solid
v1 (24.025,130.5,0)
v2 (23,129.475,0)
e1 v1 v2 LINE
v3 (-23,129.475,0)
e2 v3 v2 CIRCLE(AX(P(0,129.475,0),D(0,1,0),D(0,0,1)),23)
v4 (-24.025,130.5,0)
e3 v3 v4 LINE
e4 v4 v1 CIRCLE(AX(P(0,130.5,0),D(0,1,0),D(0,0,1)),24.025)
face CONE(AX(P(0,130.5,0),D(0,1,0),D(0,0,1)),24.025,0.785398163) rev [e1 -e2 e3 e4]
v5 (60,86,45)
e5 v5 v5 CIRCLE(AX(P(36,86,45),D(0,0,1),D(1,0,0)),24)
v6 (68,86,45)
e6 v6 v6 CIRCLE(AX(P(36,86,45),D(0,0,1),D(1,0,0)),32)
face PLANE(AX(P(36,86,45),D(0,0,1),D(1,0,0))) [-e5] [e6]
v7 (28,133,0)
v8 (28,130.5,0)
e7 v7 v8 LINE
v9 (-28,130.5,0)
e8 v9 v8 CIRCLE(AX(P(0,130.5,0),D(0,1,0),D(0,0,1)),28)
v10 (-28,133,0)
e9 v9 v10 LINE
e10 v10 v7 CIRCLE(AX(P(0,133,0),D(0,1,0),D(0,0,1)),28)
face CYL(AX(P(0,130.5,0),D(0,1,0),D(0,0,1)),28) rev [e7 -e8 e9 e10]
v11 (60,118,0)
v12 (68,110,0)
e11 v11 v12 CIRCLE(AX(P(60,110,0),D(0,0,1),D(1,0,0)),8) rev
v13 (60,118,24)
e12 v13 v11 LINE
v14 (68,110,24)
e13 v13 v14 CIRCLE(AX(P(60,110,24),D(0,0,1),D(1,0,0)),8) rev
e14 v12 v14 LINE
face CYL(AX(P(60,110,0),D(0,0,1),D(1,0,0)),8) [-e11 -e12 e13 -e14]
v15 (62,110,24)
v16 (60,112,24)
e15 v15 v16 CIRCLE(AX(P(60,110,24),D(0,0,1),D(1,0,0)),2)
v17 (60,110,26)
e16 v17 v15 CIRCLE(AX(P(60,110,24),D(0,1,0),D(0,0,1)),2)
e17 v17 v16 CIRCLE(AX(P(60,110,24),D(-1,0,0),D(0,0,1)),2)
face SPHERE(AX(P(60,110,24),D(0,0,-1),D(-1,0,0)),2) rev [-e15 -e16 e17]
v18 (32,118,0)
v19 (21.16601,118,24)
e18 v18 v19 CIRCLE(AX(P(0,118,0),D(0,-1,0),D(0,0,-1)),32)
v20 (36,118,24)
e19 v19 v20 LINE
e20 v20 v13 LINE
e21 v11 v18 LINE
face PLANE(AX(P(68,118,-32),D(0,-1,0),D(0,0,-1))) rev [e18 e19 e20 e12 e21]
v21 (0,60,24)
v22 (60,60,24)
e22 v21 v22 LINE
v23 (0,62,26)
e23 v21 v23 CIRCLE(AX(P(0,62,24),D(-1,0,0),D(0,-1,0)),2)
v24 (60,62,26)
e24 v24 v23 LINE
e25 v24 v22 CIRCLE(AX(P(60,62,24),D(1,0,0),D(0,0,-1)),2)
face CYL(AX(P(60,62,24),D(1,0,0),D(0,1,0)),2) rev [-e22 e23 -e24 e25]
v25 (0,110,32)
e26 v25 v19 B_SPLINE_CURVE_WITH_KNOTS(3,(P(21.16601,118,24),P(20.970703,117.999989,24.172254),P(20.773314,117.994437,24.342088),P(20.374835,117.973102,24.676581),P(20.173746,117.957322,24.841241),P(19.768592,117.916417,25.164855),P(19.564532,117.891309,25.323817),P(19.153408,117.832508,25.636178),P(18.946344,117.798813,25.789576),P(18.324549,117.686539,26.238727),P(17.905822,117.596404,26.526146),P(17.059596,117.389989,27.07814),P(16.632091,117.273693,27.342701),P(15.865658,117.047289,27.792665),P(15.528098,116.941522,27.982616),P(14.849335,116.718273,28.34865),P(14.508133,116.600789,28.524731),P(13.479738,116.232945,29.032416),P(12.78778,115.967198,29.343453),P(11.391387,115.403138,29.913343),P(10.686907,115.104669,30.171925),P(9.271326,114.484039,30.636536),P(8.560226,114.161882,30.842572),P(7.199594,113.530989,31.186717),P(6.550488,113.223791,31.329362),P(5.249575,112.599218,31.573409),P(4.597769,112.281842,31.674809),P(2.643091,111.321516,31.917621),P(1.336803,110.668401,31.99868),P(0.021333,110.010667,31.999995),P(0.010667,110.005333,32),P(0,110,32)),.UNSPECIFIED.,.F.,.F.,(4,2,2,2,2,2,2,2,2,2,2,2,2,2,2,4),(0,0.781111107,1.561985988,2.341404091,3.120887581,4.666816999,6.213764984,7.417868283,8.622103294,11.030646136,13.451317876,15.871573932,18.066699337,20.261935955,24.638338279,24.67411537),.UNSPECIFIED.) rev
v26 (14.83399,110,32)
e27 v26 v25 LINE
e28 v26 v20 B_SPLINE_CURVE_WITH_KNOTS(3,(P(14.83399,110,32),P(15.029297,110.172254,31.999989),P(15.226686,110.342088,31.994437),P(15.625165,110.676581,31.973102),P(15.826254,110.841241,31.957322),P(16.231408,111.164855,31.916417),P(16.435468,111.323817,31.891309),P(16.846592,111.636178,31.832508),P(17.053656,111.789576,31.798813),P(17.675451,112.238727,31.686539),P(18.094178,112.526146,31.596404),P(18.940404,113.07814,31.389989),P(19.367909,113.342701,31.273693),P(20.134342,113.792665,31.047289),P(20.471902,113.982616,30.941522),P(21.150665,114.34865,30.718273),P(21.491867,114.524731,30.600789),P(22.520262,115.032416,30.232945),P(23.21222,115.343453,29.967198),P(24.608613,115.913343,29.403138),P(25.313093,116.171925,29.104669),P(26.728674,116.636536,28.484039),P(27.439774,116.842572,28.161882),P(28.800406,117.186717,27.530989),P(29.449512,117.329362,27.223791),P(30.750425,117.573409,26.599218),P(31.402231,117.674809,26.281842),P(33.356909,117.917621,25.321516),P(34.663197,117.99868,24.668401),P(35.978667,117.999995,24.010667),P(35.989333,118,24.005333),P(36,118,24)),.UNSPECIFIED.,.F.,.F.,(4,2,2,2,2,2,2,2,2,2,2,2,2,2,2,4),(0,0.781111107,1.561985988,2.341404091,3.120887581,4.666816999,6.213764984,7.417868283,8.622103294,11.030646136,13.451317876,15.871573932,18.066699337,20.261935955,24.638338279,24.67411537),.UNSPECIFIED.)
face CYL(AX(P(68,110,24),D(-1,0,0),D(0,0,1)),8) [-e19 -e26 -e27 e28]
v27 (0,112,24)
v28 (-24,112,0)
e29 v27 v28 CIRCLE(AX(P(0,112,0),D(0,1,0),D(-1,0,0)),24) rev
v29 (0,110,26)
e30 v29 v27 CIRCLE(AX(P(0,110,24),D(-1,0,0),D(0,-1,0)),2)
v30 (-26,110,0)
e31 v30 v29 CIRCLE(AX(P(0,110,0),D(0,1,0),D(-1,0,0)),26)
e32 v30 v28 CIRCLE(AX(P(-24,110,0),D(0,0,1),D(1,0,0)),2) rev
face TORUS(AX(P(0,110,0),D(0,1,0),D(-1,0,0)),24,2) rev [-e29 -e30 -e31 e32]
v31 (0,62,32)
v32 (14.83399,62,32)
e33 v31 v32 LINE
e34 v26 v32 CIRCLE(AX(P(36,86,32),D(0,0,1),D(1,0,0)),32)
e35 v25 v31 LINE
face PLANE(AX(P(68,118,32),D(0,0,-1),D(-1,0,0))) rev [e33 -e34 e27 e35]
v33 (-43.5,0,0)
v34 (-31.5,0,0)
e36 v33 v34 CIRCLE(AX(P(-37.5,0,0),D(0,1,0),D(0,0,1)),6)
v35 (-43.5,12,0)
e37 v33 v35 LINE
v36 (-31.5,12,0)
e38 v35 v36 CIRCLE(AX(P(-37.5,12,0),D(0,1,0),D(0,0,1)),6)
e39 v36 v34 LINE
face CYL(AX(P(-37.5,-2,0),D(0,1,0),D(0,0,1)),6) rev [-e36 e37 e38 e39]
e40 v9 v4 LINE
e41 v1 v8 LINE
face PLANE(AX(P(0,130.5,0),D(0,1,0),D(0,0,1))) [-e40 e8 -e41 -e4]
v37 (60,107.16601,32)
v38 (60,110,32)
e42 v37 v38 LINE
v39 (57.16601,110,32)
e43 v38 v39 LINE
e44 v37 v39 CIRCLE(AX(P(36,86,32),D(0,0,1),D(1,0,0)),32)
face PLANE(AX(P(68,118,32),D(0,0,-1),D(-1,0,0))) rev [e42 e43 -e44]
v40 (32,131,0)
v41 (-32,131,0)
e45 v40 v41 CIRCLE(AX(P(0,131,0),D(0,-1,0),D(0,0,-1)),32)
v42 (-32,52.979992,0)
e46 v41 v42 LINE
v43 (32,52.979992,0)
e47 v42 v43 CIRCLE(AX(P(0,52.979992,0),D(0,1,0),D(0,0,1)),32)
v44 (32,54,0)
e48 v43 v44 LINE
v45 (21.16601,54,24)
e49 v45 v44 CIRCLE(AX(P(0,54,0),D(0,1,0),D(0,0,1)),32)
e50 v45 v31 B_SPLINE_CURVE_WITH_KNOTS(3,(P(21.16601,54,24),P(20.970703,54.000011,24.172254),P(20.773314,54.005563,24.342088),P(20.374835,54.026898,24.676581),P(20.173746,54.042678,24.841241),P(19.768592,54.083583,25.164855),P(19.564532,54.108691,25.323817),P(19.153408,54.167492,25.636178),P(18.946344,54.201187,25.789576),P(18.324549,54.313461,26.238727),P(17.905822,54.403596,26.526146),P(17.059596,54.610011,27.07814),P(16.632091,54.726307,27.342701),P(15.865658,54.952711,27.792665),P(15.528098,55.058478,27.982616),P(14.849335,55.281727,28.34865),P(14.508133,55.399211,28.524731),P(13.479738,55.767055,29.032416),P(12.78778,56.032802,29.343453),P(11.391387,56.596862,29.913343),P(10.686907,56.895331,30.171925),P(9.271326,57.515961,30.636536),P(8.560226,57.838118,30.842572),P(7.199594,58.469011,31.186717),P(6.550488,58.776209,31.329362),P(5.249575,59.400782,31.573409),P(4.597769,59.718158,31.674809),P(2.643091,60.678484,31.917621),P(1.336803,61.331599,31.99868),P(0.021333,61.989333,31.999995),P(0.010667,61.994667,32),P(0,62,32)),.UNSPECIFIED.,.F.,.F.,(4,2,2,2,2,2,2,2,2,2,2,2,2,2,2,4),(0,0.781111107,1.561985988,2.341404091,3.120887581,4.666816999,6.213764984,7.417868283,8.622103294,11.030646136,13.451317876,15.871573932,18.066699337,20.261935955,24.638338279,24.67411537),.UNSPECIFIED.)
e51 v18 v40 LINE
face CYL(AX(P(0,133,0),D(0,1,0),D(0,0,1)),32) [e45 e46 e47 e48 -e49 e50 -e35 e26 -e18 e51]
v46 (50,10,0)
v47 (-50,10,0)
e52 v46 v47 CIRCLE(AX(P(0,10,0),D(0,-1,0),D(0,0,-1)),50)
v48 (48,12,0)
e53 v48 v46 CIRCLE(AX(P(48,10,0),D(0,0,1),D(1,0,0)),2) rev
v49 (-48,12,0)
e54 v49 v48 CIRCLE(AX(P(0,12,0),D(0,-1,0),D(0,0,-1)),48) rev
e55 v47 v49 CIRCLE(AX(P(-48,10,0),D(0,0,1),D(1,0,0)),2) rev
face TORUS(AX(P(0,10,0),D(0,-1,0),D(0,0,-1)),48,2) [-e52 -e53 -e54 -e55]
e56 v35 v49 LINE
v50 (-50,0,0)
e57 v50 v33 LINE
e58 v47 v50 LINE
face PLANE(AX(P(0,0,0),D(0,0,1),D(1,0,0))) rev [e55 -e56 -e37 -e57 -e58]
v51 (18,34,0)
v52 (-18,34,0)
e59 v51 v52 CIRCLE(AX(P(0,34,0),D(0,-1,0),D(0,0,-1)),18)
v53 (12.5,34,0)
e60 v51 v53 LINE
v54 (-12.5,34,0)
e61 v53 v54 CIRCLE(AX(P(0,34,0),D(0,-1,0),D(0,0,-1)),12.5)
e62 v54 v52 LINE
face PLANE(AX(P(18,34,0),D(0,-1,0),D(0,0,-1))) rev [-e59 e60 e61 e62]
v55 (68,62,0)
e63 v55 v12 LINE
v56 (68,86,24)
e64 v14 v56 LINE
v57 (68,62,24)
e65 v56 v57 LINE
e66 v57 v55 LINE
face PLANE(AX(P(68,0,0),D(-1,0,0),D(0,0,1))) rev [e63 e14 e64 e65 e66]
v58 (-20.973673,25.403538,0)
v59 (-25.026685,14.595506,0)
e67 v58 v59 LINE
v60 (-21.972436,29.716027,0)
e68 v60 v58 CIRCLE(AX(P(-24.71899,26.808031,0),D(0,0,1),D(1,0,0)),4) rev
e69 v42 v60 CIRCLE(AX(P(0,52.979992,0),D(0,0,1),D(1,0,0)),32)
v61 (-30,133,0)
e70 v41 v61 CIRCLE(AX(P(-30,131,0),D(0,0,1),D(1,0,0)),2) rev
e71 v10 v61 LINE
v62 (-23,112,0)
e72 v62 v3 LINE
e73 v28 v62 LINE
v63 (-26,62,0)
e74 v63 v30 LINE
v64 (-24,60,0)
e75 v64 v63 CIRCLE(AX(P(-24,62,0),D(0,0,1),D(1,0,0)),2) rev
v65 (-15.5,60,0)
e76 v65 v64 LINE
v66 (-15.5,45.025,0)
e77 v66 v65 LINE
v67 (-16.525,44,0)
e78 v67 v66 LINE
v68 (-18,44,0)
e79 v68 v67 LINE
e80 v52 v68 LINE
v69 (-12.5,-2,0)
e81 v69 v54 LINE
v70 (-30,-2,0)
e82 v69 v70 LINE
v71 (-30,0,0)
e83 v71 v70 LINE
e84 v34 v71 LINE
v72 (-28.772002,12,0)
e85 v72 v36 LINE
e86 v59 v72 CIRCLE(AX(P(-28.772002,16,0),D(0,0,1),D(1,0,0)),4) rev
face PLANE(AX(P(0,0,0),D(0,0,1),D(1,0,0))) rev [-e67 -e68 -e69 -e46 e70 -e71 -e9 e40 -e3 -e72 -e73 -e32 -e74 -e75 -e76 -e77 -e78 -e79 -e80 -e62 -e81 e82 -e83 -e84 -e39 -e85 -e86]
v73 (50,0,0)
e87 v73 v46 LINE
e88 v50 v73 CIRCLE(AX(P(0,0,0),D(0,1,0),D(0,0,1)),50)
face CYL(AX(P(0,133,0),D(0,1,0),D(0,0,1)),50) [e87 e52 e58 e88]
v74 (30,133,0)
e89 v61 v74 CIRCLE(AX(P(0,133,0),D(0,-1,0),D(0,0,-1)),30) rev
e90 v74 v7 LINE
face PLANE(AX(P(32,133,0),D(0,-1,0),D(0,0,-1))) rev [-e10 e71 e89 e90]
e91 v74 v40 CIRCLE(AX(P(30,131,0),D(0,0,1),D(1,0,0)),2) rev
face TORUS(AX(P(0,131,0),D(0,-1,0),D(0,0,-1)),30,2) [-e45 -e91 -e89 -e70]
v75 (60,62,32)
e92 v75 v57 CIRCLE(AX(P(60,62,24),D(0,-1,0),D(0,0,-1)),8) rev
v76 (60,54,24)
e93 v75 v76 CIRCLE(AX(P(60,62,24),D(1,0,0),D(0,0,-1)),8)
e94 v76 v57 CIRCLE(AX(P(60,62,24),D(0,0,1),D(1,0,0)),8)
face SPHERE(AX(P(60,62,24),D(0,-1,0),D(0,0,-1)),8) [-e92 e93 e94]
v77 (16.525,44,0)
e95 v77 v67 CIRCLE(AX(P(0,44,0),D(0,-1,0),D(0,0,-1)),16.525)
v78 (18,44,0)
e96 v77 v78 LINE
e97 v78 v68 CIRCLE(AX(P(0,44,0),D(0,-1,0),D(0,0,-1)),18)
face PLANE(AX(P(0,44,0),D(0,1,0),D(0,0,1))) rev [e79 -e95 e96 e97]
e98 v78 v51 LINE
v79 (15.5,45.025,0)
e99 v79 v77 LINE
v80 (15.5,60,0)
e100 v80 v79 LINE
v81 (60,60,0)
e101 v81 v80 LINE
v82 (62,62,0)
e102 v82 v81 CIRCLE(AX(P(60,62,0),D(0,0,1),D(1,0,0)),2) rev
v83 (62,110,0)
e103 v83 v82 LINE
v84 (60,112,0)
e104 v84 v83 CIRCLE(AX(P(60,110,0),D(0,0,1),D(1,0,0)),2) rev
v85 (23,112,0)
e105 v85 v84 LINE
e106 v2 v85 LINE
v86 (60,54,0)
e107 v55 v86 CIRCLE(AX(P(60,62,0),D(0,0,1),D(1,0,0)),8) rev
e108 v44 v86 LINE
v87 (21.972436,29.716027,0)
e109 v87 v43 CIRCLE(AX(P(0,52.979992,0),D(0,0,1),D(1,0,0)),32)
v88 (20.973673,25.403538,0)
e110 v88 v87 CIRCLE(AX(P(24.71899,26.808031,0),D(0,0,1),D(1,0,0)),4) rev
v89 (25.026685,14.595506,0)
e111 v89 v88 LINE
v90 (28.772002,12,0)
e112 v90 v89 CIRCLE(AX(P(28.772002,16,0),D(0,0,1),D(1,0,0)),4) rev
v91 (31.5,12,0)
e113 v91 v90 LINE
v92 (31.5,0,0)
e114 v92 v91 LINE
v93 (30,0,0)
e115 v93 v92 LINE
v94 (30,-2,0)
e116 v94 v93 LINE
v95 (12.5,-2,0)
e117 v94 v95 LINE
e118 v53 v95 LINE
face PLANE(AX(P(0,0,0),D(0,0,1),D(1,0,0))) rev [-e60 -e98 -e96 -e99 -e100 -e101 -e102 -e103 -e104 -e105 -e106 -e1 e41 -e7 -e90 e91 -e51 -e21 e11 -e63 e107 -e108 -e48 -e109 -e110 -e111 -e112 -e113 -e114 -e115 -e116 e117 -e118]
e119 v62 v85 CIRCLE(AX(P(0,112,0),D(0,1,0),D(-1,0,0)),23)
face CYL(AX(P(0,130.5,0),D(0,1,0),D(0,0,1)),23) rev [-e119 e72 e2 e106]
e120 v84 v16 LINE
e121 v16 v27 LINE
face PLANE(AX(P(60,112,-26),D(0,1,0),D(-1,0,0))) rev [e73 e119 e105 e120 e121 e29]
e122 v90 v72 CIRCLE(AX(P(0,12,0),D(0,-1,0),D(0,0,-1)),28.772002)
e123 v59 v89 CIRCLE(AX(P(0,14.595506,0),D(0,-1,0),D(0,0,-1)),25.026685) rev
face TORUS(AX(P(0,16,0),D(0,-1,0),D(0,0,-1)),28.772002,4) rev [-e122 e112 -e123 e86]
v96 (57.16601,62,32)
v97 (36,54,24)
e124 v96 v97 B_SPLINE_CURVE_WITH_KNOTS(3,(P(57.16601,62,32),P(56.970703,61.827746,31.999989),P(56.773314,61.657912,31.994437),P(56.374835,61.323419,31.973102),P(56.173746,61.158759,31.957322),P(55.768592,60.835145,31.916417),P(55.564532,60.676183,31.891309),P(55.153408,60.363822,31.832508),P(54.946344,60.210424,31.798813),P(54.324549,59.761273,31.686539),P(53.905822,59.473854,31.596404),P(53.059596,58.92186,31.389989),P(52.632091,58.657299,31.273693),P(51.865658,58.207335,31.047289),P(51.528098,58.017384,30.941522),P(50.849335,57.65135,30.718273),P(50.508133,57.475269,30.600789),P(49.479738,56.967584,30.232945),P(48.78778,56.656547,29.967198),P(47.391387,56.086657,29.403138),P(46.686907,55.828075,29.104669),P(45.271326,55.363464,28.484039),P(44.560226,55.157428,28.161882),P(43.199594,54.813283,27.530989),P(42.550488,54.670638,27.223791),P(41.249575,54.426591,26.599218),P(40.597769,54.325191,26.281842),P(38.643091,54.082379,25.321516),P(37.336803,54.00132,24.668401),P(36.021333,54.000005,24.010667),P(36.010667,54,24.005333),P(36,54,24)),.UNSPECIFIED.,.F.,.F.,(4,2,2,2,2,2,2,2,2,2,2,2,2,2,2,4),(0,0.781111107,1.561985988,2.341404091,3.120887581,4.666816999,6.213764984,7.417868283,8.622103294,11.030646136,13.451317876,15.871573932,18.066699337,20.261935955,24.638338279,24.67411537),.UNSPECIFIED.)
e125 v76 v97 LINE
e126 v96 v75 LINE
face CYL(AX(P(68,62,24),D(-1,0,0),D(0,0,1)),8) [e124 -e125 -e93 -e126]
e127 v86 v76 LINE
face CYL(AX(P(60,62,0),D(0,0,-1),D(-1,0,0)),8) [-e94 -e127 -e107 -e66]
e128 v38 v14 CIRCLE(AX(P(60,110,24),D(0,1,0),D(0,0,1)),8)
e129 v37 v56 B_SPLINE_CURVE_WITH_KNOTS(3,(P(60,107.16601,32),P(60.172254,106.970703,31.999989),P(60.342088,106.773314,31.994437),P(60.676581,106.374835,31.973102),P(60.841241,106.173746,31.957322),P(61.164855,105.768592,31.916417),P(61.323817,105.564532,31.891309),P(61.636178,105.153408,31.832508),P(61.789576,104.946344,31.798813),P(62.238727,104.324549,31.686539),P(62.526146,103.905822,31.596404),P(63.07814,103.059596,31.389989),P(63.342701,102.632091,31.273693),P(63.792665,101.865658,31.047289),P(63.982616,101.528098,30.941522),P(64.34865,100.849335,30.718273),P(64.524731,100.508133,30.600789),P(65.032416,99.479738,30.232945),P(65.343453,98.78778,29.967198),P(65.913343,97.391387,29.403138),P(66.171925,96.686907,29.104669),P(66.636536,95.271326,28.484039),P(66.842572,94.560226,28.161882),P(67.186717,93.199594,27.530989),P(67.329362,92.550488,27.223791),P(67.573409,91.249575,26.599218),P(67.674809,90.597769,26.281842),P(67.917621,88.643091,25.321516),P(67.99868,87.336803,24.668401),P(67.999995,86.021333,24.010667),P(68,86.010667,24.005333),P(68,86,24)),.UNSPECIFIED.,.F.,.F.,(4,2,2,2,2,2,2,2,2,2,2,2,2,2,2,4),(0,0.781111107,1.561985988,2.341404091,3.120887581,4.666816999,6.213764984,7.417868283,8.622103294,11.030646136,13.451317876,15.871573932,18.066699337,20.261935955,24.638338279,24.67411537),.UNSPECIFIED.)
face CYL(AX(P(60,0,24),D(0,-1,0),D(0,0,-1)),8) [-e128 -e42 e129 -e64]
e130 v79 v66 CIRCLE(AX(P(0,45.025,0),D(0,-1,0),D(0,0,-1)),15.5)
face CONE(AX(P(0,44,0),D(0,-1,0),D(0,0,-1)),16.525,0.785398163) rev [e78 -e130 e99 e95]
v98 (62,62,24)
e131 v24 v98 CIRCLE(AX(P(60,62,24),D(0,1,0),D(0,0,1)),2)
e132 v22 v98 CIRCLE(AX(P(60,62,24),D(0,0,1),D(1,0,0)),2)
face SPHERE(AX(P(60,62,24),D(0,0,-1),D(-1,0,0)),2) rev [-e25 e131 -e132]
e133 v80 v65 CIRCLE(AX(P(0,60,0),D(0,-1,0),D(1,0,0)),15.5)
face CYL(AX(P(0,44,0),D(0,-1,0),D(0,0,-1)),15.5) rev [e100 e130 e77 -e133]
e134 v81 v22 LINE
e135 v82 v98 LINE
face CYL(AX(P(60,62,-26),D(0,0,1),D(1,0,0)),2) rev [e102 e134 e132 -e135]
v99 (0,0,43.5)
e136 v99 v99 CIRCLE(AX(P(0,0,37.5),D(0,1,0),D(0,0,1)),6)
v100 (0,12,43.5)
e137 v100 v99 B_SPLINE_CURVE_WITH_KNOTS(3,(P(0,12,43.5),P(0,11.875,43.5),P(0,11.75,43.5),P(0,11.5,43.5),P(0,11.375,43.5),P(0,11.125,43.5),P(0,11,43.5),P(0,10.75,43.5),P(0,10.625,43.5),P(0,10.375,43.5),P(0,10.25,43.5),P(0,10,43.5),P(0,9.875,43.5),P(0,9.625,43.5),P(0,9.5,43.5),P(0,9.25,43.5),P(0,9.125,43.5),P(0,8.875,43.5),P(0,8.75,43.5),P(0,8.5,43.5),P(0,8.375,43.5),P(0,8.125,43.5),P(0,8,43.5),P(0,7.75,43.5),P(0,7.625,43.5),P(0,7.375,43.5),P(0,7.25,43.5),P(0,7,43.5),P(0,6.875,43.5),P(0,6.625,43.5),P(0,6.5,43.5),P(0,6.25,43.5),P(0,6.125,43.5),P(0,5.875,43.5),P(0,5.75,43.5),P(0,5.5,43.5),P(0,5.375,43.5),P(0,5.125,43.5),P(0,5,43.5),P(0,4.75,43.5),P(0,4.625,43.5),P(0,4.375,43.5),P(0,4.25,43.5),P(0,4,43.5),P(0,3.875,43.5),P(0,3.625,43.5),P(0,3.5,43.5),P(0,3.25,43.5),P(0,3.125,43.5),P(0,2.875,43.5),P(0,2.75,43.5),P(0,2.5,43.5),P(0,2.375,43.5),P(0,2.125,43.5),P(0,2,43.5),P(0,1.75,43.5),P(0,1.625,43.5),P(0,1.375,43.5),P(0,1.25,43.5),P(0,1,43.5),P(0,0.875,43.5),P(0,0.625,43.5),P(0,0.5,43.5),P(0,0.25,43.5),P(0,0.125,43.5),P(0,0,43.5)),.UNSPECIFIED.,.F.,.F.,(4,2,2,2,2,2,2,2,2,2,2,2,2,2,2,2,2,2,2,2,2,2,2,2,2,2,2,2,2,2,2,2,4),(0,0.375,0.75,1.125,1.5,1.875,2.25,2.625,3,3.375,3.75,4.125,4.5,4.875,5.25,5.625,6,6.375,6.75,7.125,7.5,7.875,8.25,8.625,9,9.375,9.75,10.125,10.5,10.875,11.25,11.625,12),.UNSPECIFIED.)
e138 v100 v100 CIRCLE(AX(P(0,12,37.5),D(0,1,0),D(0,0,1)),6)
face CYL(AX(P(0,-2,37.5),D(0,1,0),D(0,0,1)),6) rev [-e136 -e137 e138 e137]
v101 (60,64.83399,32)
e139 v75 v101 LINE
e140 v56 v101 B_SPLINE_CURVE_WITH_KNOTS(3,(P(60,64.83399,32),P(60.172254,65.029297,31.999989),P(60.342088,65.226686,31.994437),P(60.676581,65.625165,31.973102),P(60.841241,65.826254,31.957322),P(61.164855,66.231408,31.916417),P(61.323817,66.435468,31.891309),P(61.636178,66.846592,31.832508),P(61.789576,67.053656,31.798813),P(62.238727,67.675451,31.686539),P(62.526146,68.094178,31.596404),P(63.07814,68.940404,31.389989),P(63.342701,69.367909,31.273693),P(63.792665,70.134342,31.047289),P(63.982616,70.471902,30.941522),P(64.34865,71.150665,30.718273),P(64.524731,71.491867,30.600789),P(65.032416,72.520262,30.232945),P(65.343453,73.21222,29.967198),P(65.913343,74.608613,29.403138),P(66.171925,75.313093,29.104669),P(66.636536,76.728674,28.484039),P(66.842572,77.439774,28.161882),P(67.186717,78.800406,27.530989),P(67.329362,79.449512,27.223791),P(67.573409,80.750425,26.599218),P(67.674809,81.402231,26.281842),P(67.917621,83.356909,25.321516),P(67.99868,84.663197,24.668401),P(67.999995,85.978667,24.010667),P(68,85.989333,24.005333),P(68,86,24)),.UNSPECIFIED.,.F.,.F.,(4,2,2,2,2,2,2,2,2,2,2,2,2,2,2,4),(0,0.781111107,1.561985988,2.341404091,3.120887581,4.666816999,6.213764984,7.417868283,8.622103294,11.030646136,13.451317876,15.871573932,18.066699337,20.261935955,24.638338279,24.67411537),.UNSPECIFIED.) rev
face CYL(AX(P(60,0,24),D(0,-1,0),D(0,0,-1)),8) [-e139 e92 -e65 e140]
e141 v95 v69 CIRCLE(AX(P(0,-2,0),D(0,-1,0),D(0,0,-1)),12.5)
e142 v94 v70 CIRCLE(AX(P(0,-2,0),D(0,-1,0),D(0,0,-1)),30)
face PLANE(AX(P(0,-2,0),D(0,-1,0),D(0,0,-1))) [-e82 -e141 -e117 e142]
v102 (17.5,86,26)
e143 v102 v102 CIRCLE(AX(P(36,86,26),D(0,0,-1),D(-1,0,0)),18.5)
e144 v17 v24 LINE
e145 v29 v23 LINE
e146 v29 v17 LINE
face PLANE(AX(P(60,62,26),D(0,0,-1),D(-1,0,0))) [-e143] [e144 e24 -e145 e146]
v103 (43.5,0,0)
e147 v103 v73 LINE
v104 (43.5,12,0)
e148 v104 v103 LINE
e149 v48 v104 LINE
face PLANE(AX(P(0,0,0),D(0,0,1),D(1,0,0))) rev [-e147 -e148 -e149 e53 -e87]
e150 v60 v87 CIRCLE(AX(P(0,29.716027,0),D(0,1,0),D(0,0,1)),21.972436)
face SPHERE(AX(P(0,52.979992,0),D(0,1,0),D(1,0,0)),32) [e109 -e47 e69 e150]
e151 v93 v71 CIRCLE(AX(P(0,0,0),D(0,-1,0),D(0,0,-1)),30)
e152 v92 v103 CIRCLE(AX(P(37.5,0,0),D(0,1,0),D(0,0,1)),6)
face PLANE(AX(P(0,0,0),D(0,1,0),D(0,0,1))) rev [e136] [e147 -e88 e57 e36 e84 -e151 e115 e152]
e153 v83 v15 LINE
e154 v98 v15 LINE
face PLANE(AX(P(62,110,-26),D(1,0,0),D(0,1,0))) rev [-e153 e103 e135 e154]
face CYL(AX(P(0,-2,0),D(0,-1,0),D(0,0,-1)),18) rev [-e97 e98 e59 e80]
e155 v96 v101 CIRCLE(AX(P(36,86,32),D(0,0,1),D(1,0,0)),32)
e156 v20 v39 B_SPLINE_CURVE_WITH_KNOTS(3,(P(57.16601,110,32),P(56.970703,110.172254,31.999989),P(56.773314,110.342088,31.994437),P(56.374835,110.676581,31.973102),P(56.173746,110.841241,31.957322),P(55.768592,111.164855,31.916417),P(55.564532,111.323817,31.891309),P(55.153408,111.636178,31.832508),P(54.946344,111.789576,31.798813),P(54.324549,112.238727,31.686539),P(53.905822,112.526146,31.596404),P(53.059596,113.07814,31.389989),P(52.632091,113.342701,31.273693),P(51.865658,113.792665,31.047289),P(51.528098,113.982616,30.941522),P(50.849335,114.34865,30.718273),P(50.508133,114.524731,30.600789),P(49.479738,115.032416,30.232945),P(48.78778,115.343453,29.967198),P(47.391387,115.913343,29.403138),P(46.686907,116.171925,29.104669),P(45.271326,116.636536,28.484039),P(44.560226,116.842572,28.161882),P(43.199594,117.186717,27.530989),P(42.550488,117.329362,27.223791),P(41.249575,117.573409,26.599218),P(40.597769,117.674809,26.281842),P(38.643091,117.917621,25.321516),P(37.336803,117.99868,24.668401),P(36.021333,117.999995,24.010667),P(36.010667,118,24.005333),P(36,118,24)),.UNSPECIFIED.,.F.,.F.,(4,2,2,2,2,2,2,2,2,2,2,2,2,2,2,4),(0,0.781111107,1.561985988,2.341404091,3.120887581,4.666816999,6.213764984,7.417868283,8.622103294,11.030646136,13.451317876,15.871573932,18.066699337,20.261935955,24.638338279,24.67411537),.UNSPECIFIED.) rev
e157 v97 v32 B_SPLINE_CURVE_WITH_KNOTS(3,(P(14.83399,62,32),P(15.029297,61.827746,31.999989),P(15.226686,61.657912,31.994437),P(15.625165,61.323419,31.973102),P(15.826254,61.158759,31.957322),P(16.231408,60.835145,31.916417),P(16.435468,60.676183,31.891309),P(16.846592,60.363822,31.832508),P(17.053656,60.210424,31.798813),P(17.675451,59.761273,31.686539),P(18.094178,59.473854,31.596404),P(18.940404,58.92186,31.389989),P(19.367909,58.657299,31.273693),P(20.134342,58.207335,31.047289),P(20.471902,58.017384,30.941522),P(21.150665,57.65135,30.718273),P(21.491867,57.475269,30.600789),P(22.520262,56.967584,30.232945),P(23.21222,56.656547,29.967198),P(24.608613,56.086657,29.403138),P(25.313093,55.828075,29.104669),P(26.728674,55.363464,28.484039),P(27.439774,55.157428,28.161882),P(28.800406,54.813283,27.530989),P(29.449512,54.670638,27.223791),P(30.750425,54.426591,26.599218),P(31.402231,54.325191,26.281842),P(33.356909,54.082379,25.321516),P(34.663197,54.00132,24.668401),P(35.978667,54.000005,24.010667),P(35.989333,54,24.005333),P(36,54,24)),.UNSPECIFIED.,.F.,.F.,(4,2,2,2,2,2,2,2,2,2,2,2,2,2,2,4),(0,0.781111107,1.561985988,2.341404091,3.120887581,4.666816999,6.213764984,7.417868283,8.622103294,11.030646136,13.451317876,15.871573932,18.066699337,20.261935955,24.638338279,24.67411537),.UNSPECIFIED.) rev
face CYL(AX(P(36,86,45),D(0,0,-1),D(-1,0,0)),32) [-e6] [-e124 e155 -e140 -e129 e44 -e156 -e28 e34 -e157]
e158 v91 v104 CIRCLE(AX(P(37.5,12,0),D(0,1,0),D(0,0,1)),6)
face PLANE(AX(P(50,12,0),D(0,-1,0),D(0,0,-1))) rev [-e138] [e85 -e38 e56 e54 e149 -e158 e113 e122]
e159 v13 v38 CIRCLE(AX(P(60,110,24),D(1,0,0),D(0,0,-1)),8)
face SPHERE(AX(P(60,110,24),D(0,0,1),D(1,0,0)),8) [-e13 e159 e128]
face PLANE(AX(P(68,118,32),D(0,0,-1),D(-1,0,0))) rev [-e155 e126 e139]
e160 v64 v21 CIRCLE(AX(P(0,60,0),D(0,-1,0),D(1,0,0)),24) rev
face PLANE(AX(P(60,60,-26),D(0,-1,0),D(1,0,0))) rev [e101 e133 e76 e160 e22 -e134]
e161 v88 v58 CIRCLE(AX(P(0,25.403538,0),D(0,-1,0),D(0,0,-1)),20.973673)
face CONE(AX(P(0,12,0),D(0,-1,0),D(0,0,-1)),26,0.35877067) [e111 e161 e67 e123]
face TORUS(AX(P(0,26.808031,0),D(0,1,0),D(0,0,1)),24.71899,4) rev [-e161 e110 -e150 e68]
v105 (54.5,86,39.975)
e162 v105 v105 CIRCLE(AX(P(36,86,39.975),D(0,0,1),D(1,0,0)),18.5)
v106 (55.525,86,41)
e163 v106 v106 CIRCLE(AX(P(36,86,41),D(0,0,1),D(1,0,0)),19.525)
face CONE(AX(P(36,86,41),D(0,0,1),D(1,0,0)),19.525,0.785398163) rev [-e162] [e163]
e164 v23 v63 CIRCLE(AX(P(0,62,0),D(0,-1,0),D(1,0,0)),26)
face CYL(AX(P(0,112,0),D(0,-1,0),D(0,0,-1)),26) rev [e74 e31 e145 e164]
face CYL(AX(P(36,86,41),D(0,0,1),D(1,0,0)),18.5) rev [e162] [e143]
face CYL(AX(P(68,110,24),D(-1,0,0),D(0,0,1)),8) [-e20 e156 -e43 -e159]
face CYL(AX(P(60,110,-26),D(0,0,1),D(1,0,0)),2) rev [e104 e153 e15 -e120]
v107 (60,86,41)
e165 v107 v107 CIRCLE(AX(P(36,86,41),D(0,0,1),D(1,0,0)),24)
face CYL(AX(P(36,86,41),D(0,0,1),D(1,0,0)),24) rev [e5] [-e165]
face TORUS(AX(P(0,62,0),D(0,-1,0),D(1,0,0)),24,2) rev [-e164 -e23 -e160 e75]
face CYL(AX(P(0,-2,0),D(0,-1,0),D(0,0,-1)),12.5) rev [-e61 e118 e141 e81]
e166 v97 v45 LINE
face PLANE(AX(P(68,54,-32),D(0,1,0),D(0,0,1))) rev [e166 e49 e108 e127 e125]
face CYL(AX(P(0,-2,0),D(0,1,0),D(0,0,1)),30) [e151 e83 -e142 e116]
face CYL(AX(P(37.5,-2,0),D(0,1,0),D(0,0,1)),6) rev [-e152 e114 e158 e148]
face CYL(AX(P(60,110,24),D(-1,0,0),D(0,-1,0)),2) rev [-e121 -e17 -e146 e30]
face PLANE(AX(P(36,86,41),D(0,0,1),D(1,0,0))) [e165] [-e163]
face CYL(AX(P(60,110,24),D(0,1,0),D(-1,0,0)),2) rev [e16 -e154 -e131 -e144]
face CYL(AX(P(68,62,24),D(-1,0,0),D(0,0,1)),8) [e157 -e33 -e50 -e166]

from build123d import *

# Parameters (mm, degrees)
SKETCH2_R           = 30
BOSS_EXTRUDE1_DEPTH = 2
SKETCH3_W           = 64
SKETCH3_H           = 64
BOSS_EXTRUDE2_DEPTH = 68
FILLET1_R           = 8
BOSS_EXTRUDE3_START = -8
SKETCH4_R           = 32
BOSS_EXTRUDE3_DEPTH = 21
FILLET2_R           = 4
SKETCH5_R           = 6
BOSS_EXTRUDE4_DEPTH = 12
SKETCH6_R           = 24
BOSS_EXTRUDE5_DEPTH = 2
SKETCH7_R           = 26
SKETCH8_R           = 23
CUT_EXTRUDE1_DEPTH  = 26
SKETCH13_R          = 26
CUT_EXTRUDE2_DEPTH  = 26
CUT_EXTRUDE3_REACH  = 206.397
SKETCH14_R          = 18
SKETCH15_R          = 24
CUT_EXTRUDE4_DEPTH  = 4
SKETCH20_R          = 28
CUT_EXTRUDE5_DEPTH  = 2.5
FILLET3_R           = 2
SKETCH26_R          = 6
CUT_EXTRUDE6_DEPTH  = 170.49926259


with BuildPart() as part:
    # Sketch1 → Revolve1 (revolve)
    with BuildSketch(Plane.XY, mode=Mode.PRIVATE) as revolve1_sk:
        with BuildLine():
            Line((0, 0), (50, 0))
            Line((50, 0), (50, 12))
            Line((50, 12), (26, 12))
            Line((26, 12), (20, 28))
            ThreePointArc((20, 28), (28.844410204, 39.123585533), (32, 52.979991994))
            Line((32, 52.979991994), (32, 133))
            Line((32, 133), (0, 133))
            Line((0, 133), (0, 0))
        make_face()
    revolve(revolve1_sk.sketch.rotate(Axis((0, 133, 0), (0, -1, 0)), 90), axis=Axis((0, 133, 0), (0, -1, 0)))

    # Sketch2 → Boss-Extrude1 (add)
    with BuildSketch(Plane.XZ):
        with Locations(Location((0, 0, 0), (0, 0, 270))):
            Circle(SKETCH2_R)
    extrude(amount=BOSS_EXTRUDE1_DEPTH)

    # Sketch3 → Boss-Extrude2 (add)
    with BuildSketch(Plane(origin=(0, 0, 0), x_dir=(0, 0, -1), z_dir=(1, 0, 0))):
        with Locations((0, 86)):
            Rectangle(SKETCH3_W, SKETCH3_H)
    extrude(amount=BOSS_EXTRUDE2_DEPTH)

    # Fillet1
    # the kernel refuses this fillet: 8 mm, written as the material it takes off along each edge
    with BuildSketch(Plane(origin=(60, 110, 24), x_dir=(0, 1, 0), z_dir=(0, 0, 1))) as fillet1_piece_1_section:
        Polygon((0, 0), (FILLET1_R * 1.02, 0), (FILLET1_R * 1.02, -FILLET1_R * 1.02), (0, -FILLET1_R * 1.02), align=None)
    fillet1_piece_1 = extrude(amount=FILLET1_R * 1.02, mode=Mode.PRIVATE)
    fillet1_piece_1 = fillet1_piece_1 - Plane(origin=(60, 110, 24), x_dir=(-0.7071067811865475, -0.7071067811865475, 0), z_dir=(0, 0, 1)) * Sphere(FILLET1_R, mode=Mode.PRIVATE)
    add(fillet1_piece_1, mode=Mode.SUBTRACT)
    with BuildSketch(Plane(origin=(60, 62, 24), x_dir=(0, -1, 0), z_dir=(0, 0, 1))) as fillet1_piece_2_section:
        Polygon((0, 0), (FILLET1_R * 1.02, 0), (FILLET1_R * 1.02, FILLET1_R * 1.02), (0, FILLET1_R * 1.02), align=None)
    fillet1_piece_2 = extrude(amount=FILLET1_R * 1.02, mode=Mode.PRIVATE)
    fillet1_piece_2 = fillet1_piece_2 - Plane(origin=(60, 62, 24), x_dir=(-0.7071067811865475, 0.7071067811865475, 0), z_dir=(0, 0, 1)) * Sphere(FILLET1_R, mode=Mode.PRIVATE)
    add(fillet1_piece_2, mode=Mode.SUBTRACT)
    with BuildSketch(Plane(origin=(60, 62, -24), x_dir=(0, -1, 0), z_dir=(0, 0, -1))) as fillet1_piece_3_section:
        Polygon((0, 0), (FILLET1_R * 1.02, 0), (FILLET1_R * 1.02, -FILLET1_R * 1.02), (0, -FILLET1_R * 1.02), align=None)
    fillet1_piece_3 = extrude(amount=FILLET1_R * 1.02, mode=Mode.PRIVATE)
    fillet1_piece_3 = fillet1_piece_3 - Plane(origin=(60, 62, -24), x_dir=(-0.7071067811865475, 0.7071067811865475, 0), z_dir=(0, 0, -1)) * Sphere(FILLET1_R, mode=Mode.PRIVATE)
    add(fillet1_piece_3, mode=Mode.SUBTRACT)
    with BuildSketch(Plane(origin=(60, 110, -24), x_dir=(0, 0, -1), z_dir=(0, 1, 0))) as fillet1_piece_4_section:
        Polygon((0, 0), (FILLET1_R * 1.02, 0), (FILLET1_R * 1.02, -FILLET1_R * 1.02), (0, -FILLET1_R * 1.02), align=None)
    fillet1_piece_4 = extrude(amount=FILLET1_R * 1.02, mode=Mode.PRIVATE)
    fillet1_piece_4 = fillet1_piece_4 - Plane(origin=(60, 110, -24), x_dir=(-0.7071067811865475, 0, 0.7071067811865475), z_dir=(0, 1, 0)) * Sphere(FILLET1_R, mode=Mode.PRIVATE)
    add(fillet1_piece_4, mode=Mode.SUBTRACT)
    with BuildSketch(Plane(origin=(-20, 118, 32), x_dir=(0, -1, 0), z_dir=(1, 0, 0))) as fillet1_piece_5_section:
        with BuildLine():
            CenterArc((FILLET1_R, FILLET1_R), FILLET1_R, 180, 90)
            Line((0, FILLET1_R), (0, 0))
            Line((0, 0), (FILLET1_R, 0))
        make_face()
    fillet1_piece_5 = extrude(amount=80, mode=Mode.PRIVATE)
    fillet1_piece_5 = fillet1_piece_5 - Plane(origin=(0, 116.13109064, 0), x_dir=(0, 0, 1), z_dir=(0, 1, 0)) * Cylinder(32, 192, mode=Mode.PRIVATE)
    add(fillet1_piece_5, mode=Mode.SUBTRACT)
    with BuildSketch(Plane(origin=(-20, 54, 32), x_dir=(0, 1, 0), z_dir=(1, 0, 0))) as fillet1_piece_6_section:
        with BuildLine():
            CenterArc((FILLET1_R, -FILLET1_R), FILLET1_R, 90, 90)
            Line((0, -FILLET1_R), (0, 0))
            Line((0, 0), (FILLET1_R, 0))
        make_face()
    fillet1_piece_6 = extrude(amount=80, mode=Mode.PRIVATE)
    fillet1_piece_6 = fillet1_piece_6 - Plane(origin=(0, 55.86890936, 0), x_dir=(0, 0, 1), z_dir=(0, 1, 0)) * Cylinder(32, 192, mode=Mode.PRIVATE)
    add(fillet1_piece_6, mode=Mode.SUBTRACT)
    with BuildSketch(Plane(origin=(-20, 54, -32), x_dir=(0, 1, 0), z_dir=(1, 0, 0))) as fillet1_piece_7_section:
        with BuildLine():
            CenterArc((FILLET1_R, FILLET1_R), FILLET1_R, 180, 90)
            Line((0, FILLET1_R), (0, 0))
            Line((0, 0), (FILLET1_R, 0))
        make_face()
    fillet1_piece_7 = extrude(amount=80, mode=Mode.PRIVATE)
    fillet1_piece_7 = fillet1_piece_7 - Plane(origin=(0, 55.868908347, 0), x_dir=(0, 0, 1), z_dir=(0, 1, 0)) * Cylinder(32, 193, mode=Mode.PRIVATE)
    add(fillet1_piece_7, mode=Mode.SUBTRACT)
    with BuildSketch(Plane(origin=(-20, 118, -32), x_dir=(0, 0, 1), z_dir=(1, 0, 0))) as fillet1_piece_8_section:
        with BuildLine():
            CenterArc((FILLET1_R, FILLET1_R), FILLET1_R, 180, 90)
            Line((0, FILLET1_R), (0, 0))
            Line((0, 0), (FILLET1_R, 0))
        make_face()
    fillet1_piece_8 = extrude(amount=80, mode=Mode.PRIVATE)
    fillet1_piece_8 = fillet1_piece_8 - Plane(origin=(0, 116.131091799, 0), x_dir=(0, 0, 1), z_dir=(0, 1, 0)) * Cylinder(32, 192, mode=Mode.PRIVATE)
    add(fillet1_piece_8, mode=Mode.SUBTRACT)
    with BuildSketch(Plane(origin=(68, 110, 32), x_dir=(-1, 0, 0), z_dir=(0, -1, 0)), Plane(origin=(68, 54, 24), x_dir=(-1, 0, 0), z_dir=(0, 0, -1)), Plane(origin=(68, 62, -32), x_dir=(-1, 0, 0), z_dir=(0, 1, 0)), Plane(origin=(68, 118, -24), x_dir=(-1, 0, 0), z_dir=(0, 0, 1))) as fillet1_piece_9:
        with BuildLine():
            CenterArc((FILLET1_R, FILLET1_R), FILLET1_R, 180, 90)
            Line((0, FILLET1_R), (0, 0))
            Line((0, 0), (FILLET1_R, 0))
        make_face()
    extrude(amount=48, mode=Mode.SUBTRACT)

    # Sketch4 → Boss-Extrude3 (add)
    with BuildSketch(Plane.XY.offset(32).offset(BOSS_EXTRUDE3_START)):
        with Locations((36, 86)):
            Circle(SKETCH4_R)
    extrude(amount=BOSS_EXTRUDE3_DEPTH)

    # Fillet2
    fillet2_edges = [part.edges().sort_by_distance(p)[0] for p in [
        (0, 28, -20),
        (0, 12, -26),
    ]]
    fillet(fillet2_edges, radius=FILLET2_R)



with BuildPart() as body_2:
    # Sketch5 → Boss-Extrude4 (new body)
    with BuildSketch(Plane.XY.offset(-73)):
        with BuildLine():
            Line((-8.631578947, 69.266137306), (24.210526316, 56.250910766))
            ThreePointArc((24.210526316, 56.250910766), (36, 54), (47.789473684, 56.250910766))
            Line((47.789473684, 56.250910766), (80.631578947, 69.266137306))
            ThreePointArc((80.631578947, 69.266137306), (92, 86), (80.631578947, 102.733862694))
            Line((80.631578947, 102.733862694), (47.789473684, 115.749089234))
            ThreePointArc((47.789473684, 115.749089234), (36, 118), (24.210526316, 115.749089234))
            Line((24.210526316, 115.749089234), (-8.631578947, 102.733862694))
            ThreePointArc((-8.631578947, 102.733862694), (-20, 86), (-8.631578947, 69.266137306))
        make_face()
        with Locations((-2, 86)):
            Circle(SKETCH5_R, mode=Mode.SUBTRACT)
        with Locations((74, 86)):
            Circle(SKETCH5_R, mode=Mode.SUBTRACT)
    extrude(amount=BOSS_EXTRUDE4_DEPTH)

    # Sketch6 → Boss-Extrude5 (add)
    with BuildSketch(Plane(origin=(0, 0, -73), x_dir=(-1, 0, 0), z_dir=(0, 0, -1))):
        with Locations(Location((-36, 86, 0), (0, 0, 180))):
            Circle(SKETCH6_R)
    extrude(amount=BOSS_EXTRUDE5_DEPTH)


with BuildPart() as part_1:
    add(part.part)

    add(body_2.part)  # Loft2 merges body 2
    # Sketch7 → Loft2 section 0
    with BuildSketch(Plane.XY.offset(-61)):
        with Locations((36, 86)):
            Circle(SKETCH7_R)
    # Sketch8 → Loft2 section 1
    with BuildSketch(Plane(origin=(0, 0, -32), x_dir=(-1, 0, 0), z_dir=(0, 0, -1))):
        with Locations((-36, 86)):
            Circle(SKETCH8_R)
    loft()

    # Sketch11 → Cut-Extrude1 (cut, symmetric)
    with BuildSketch(Plane.XY):
        with BuildLine():
            Line((60, 112), (0, 112))
            Line((0, 112), (0, 60))
            Line((0, 60), (60, 60))
            ThreePointArc((60, 60), (61.414213562, 60.585786438), (62, 62))
            Line((62, 62), (62, 110))
            ThreePointArc((62, 110), (61.414213562, 111.414213562), (60, 112))
        make_face()
    extrude(amount=CUT_EXTRUDE1_DEPTH, both=True, mode=Mode.SUBTRACT)

    # Sketch13 → Cut-Extrude2 (cut, symmetric)
    with BuildSketch(Plane(origin=(0, 86, 0), x_dir=(-1, 0, 0), z_dir=(0, -1, 0))):
        Circle(SKETCH13_R)
    extrude(amount=CUT_EXTRUDE2_DEPTH, both=True, mode=Mode.SUBTRACT)

    # Sketch14 → Cut-Extrude3 (cut, up to next)
    with BuildSketch(Plane(origin=(0, 0, -75), x_dir=(-1, 0, 0), z_dir=(0, 0, -1)), mode=Mode.PRIVATE) as cut_extrude3_sk1:
        with Locations((-36, 86)):
            Circle(SKETCH14_R)
    cut_extrude3_tool1 = extrude(cut_extrude3_sk1.sketch, amount=-CUT_EXTRUDE3_REACH, mode=Mode.PRIVATE) & part_1.part
    add(cut_extrude3_tool1.solids().sort_by_distance((36, 86, -75))[0], mode=Mode.SUBTRACT)

    # Sketch15 → Cut-Extrude4 (cut)
    with BuildSketch(Plane.XY.offset(45)):
        with Locations((36, 86)):
            Circle(SKETCH15_R)
    extrude(amount=-CUT_EXTRUDE4_DEPTH, mode=Mode.SUBTRACT)

    # Sketch19 → M39x2.0 Tapped Hole1 (revolve, cut)
    with BuildSketch(Plane(origin=(36, 86, 41), x_dir=(0, -1, 0), z_dir=(1, 0, 0))):
        Polygon((0, 0), (0, 15), (18.5, 15), (18.5, 1.025), (19.525, 0), align=None)
    revolve(axis=Axis((36, 86, 47.35), (0, 0, -1)), mode=Mode.SUBTRACT)

    # Sketch20 → Cut-Extrude5 (cut)
    with BuildSketch(Plane(origin=(0, 133, 0), x_dir=(1, 0, 0), z_dir=(0, 1, 0))):
        with Locations(Location((0, 0, 0), (0, 0, 270))):
            Circle(SKETCH20_R)
    extrude(amount=-CUT_EXTRUDE5_DEPTH, mode=Mode.SUBTRACT)

    # Sketch22 → M48x2.0 Tapped Hole1 (revolve, cut)
    with BuildSketch(Plane(origin=(0, 130.5, 0), x_dir=(0, 0, 1), z_dir=(1, 0, 0))):
        Polygon((0, 0), (0, 18.5), (23, 18.5), (23, 1.025), (24.025, 0), align=None)
    revolve(axis=Axis((0, 136.85, 0), (0, -1, 0)), mode=Mode.SUBTRACT)

    # Sketch23 → Cut-Revolve1 (revolve, cut)
    with BuildSketch(Plane.XY, mode=Mode.PRIVATE) as cut_revolve1_sk:
        Polygon((0, 44), (18, 44), (18, 34), (12.5, 34), (12.5, -2), (0, -2), align=None)
    revolve(cut_revolve1_sk.sketch.rotate(Axis((0, -2, 0), (0, 1, 0)), 90), axis=Axis((0, -2, 0), (0, 1, 0)), mode=Mode.SUBTRACT)

    # Sketch25 → M33x2.0 Tapped Hole1 (revolve, cut)
    with BuildSketch(Plane(origin=(0, 44, 0), x_dir=(0, 0, -1), z_dir=(1, 0, 0))):
        Polygon((0, 0), (0, 16), (15.5, 16), (15.5, 1.025), (16.525, 0), align=None)
    revolve(axis=Axis((0, 37.65, 0), (0, 1, 0)), mode=Mode.SUBTRACT)

    # Fillet3
    fillet3_edges = [part_1.edges().sort_by_distance(p)[0] for p in [
        (64.210526316, 62.758524036, -61),
        (7.789473684, 109.241475964, -61),
        (-20, 86, -61),
        (10, 86, -61),
        (7.789473684, 62.758524036, -61),
        (36, 54, -61),
        (92, 86, -61),
        (64.210526316, 109.241475964, -61),
        (36, 118, -61),
        (30, 112, 26),
        (61.414213562, 111.414213562, 26),
        (62, 86, 26),
        (61.414213562, 60.585786438, 26),
        (30, 60, 26),
        (30, 60, -26),
        (61.414213562, 60.585786438, -26),
        (62, 86, -26),
        (61.414213562, 111.414213562, -26),
        (30, 112, -26),
        (-26, 112, 0),
        (-26, 60, 0),
        (0, 133, -32),
        (0, 12, -50),
    ]]
    fillet(fillet3_edges, radius=FILLET3_R)

    # Sketch26 → Cut-Extrude6 (cut, through all)
    with BuildSketch(Plane(origin=(0, 12, 0), x_dir=(1, 0, 0), z_dir=(0, 1, 0))):
        with Locations(Location((0, 37.5, 0), (0, 0, 270))):
            Circle(SKETCH26_R)
        with Locations(Location((37.5, 0, 0), (0, 0, 270))):
            Circle(SKETCH26_R)
        with Locations(Location((0, -37.5, 0), (0, 0, 270))):
            Circle(SKETCH26_R)
        with Locations(Location((-37.5, 0, 0), (0, 0, 270))):
            Circle(SKETCH26_R)
    extrude(amount=-CUT_EXTRUDE6_DEPTH, mode=Mode.SUBTRACT)

    # Split1
    split(bisect_by=Plane.XY, keep=Keep.TOP)


solid = part_1.part
